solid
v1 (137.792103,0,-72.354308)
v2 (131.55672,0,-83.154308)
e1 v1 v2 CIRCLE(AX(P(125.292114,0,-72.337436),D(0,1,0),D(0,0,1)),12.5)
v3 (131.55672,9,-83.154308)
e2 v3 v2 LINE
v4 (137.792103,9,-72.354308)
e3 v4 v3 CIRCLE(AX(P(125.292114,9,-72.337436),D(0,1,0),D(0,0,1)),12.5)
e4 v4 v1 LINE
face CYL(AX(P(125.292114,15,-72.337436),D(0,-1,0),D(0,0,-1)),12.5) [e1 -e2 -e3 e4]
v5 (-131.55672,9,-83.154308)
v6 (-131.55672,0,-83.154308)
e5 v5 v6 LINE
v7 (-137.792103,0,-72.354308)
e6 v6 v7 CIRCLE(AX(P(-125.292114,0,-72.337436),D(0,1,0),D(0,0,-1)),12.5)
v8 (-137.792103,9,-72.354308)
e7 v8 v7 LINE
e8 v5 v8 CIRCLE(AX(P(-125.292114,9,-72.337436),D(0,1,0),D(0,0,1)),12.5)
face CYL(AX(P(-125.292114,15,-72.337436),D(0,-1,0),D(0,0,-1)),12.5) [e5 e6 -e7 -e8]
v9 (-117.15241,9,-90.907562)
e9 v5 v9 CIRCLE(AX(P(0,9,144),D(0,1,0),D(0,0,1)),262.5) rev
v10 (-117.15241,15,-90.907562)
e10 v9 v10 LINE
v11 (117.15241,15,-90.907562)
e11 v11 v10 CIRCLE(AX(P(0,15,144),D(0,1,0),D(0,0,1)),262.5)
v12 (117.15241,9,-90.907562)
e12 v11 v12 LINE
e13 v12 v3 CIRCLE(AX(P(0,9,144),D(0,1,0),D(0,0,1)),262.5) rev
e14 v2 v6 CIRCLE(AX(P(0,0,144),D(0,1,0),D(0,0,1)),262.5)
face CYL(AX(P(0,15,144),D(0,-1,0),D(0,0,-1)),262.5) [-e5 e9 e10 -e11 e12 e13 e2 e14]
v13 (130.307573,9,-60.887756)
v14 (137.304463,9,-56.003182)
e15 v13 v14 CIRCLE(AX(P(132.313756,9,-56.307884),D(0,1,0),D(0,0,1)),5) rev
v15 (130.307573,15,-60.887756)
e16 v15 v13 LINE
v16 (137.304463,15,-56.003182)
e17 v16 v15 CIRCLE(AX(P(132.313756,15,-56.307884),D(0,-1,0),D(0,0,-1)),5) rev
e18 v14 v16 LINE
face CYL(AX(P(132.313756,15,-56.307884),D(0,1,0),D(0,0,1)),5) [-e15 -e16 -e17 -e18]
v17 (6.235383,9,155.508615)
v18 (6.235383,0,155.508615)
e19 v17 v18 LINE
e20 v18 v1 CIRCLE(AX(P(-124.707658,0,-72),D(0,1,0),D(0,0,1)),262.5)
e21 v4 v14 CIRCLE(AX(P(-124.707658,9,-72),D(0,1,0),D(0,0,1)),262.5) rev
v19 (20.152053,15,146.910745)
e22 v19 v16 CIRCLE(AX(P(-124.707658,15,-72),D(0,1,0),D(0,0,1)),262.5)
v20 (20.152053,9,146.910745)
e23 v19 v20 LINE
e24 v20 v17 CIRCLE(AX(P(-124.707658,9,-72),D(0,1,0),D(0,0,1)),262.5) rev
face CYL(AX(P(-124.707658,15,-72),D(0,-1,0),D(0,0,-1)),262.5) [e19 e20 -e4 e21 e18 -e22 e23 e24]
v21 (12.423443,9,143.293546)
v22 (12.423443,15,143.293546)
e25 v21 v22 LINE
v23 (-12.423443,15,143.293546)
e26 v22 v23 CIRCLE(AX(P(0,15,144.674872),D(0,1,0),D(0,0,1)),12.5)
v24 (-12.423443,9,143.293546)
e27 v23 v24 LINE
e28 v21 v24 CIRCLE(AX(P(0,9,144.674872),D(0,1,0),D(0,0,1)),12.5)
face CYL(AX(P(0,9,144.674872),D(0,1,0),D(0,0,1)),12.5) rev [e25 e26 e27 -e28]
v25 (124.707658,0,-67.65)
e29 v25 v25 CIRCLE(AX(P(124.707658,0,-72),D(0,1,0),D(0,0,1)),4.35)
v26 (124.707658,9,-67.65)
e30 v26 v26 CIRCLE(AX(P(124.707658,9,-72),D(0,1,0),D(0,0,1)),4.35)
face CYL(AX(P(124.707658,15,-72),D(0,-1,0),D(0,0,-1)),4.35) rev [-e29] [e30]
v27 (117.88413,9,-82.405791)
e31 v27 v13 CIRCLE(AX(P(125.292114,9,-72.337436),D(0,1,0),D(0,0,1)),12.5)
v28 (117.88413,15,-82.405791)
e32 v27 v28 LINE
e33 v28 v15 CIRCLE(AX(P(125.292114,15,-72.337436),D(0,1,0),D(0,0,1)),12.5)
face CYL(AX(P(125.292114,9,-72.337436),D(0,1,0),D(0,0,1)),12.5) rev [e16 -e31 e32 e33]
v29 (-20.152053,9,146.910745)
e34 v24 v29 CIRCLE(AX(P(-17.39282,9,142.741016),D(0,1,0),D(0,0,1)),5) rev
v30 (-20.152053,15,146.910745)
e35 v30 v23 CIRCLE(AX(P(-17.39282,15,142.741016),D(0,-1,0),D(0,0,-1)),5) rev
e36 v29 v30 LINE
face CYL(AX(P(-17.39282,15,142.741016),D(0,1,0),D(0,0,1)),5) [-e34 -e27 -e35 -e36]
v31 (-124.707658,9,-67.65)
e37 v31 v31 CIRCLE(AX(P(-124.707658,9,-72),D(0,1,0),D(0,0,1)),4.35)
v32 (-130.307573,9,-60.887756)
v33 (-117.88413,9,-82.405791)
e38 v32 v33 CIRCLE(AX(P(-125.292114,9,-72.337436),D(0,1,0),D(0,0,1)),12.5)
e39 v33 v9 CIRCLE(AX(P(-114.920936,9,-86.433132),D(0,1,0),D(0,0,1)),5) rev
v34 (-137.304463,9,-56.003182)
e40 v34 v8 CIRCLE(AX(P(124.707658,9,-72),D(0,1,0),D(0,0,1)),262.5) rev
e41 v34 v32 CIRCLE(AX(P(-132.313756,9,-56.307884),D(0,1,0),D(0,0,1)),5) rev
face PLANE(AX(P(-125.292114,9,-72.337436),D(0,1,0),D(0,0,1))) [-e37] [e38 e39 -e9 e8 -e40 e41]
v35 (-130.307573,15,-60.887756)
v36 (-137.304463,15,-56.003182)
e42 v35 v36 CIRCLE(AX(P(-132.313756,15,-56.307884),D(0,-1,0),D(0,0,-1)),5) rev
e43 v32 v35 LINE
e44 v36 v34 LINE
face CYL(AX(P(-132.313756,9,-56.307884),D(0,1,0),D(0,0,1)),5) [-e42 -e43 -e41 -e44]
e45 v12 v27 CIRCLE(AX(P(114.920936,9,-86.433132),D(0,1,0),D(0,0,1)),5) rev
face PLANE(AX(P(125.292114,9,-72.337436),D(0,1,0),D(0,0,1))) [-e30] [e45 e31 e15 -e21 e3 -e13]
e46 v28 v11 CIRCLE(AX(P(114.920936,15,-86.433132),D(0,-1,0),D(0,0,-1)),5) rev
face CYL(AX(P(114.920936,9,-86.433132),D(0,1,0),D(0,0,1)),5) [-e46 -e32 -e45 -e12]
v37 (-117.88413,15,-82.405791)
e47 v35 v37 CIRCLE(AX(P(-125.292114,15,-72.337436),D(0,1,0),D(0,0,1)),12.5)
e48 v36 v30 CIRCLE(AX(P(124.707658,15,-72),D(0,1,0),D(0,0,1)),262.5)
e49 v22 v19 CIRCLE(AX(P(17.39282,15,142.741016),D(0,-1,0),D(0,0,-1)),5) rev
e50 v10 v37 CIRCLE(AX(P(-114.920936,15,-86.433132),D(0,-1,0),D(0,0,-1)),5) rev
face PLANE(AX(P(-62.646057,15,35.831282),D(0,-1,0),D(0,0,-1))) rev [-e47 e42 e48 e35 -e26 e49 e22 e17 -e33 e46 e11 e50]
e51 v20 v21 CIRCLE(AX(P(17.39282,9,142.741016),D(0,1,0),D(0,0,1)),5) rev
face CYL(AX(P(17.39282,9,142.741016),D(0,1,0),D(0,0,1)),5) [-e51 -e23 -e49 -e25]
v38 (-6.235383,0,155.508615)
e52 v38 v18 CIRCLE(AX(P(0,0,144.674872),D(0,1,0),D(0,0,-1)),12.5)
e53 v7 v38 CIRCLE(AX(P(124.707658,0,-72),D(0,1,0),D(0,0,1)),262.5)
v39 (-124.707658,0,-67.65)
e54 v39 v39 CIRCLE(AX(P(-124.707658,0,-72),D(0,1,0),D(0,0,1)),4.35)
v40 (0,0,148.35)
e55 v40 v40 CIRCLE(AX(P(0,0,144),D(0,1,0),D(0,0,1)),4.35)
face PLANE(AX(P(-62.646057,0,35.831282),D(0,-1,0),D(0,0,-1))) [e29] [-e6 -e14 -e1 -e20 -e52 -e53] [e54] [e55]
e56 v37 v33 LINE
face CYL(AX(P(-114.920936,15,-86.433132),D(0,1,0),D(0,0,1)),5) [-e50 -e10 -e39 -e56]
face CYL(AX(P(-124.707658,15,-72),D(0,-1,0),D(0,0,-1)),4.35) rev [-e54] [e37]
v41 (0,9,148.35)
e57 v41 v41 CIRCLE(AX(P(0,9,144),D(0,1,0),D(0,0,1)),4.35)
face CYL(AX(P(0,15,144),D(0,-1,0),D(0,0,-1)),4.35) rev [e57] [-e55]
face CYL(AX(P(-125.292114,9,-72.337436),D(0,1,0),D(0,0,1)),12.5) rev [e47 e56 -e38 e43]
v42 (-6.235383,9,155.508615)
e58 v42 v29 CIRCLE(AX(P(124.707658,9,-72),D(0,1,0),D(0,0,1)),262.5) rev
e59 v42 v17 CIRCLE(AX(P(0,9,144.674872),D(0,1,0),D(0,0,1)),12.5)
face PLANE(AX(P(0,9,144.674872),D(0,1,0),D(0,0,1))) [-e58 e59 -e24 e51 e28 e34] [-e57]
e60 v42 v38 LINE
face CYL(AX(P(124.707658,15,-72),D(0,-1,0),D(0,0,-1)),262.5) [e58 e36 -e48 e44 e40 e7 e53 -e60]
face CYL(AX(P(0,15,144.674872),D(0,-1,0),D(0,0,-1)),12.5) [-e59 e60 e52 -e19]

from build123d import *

# Parameters (mm, degrees)
CROQUIS2_R                 = 4.35
ESPESOR_DE_BASE_FIJA_DEPTH = 15
CUT_EXTRUDE1_START         = -6
SKETCH2_R                  = 12.5
CUT_EXTRUDE1_DEPTH         = 6
FILLET1_START              = 9
FILLET1_DEPTH              = 7


with BuildPart() as part:
    # Croquis2 → Espesor de base fija (new body)
    with BuildSketch(Plane(origin=(0, 0, 0), x_dir=(1, 0, 0), z_dir=(0, 1, 0))):
        with BuildLine():
            ThreePointArc((131.556719836, 83.154307611), (0, 118.5), (-131.556719836, 83.154307611))
            ThreePointArc((-131.556719836, 83.154307611), (-136.117431676, 78.58743582), (-137.792102743, 72.354307611))
            ThreePointArc((-137.792102743, 72.354307611), (-102.624010348, -59.25), (-6.235382907, -155.508615221))
            ThreePointArc((-6.235382907, -155.508615221), (0, -157.17487164), (6.235382907, -155.508615221))
            ThreePointArc((6.235382907, -155.508615221), (102.624010348, -59.25), (137.792102743, 72.354307611))
            ThreePointArc((137.792102743, 72.354307611), (136.117431676, 78.58743582), (131.556719836, 83.154307611))
        make_face()
        with Locations(Location((0, -144, 0), (0, 0, 270))):
            Circle(CROQUIS2_R, mode=Mode.SUBTRACT)
        with Locations(Location((-124.707658145, 72, 0), (0, 0, 270))):
            Circle(CROQUIS2_R, mode=Mode.SUBTRACT)
        with Locations(Location((124.707658145, 72, 0), (0, 0, 270))):
            Circle(CROQUIS2_R, mode=Mode.SUBTRACT)
    extrude(amount=ESPESOR_DE_BASE_FIJA_DEPTH)

    # Sketch2 → Cut-Extrude1 (cut)
    with BuildSketch(Plane(origin=(0, 15, 0), x_dir=(1, 0, 0), z_dir=(0, 1, 0)).offset(CUT_EXTRUDE1_START)):
        with Locations((-125.292114129, 72.33743582)):
            Circle(SKETCH2_R)
        with Locations((125.292114129, 72.33743582)):
            Circle(SKETCH2_R)
        with Locations((0, -144.67487164)):
            Circle(SKETCH2_R)
    extrude(amount=CUT_EXTRUDE1_DEPTH, mode=Mode.SUBTRACT)

    # Fillet1: read off the stored shape, not the designer's step
    # Fillet1 outline → Fillet1 (cut)
    with BuildSketch(Plane(origin=(0, 0, 0), x_dir=(1, 0, 0), z_dir=(0, 1, 0)).offset(FILLET1_START)):
        with BuildLine():
            ThreePointArc((-117.884129659, 82.405790506), (-119.902519436, 86.861880767), (-117.152410353, 90.907562135))
            ThreePointArc((-117.152410353, 90.907562135), (-124.41497538, 87.143167542), (-131.556719836, 83.154307611))
            ThreePointArc((-131.556719836, 83.154307611), (-124.608814624, 84.818745919), (-117.884129659, 82.405790506))
        make_face()
        with BuildLine():
            ThreePointArc((131.556719836, 83.154307611), (124.41497538, 87.143167542), (117.152410353, 90.907562136))
            ThreePointArc((117.152410353, 90.907562136), (119.902519436, 86.861880767), (117.884129659, 82.405790506))
            ThreePointArc((117.884129659, 82.405790506), (124.608814624, 84.818745919), (131.556719836, 83.154307611))
        make_face()
        with BuildLine():
            ThreePointArc((-137.304463382, 56.003182413), (-135.175855082, 60.407687426), (-130.307572826, 60.887755734))
            ThreePointArc((-130.307572826, 60.887755734), (-135.759595995, 65.505026041), (-137.792102743, 72.354307611))
            ThreePointArc((-137.792102743, 72.354307611), (-137.675684548, 64.174945519), (-137.304463382, 56.003182413))
        make_face()
        with BuildLine():
            ThreePointArc((137.792102743, 72.354307611), (135.759595995, 65.505026041), (130.307572826, 60.887755734))
            ThreePointArc((130.307572826, 60.887755734), (135.175855082, 60.407687426), (137.304463382, 56.003182413))
            ThreePointArc((137.304463382, 56.003182413), (137.675684548, 64.174945519), (137.792102743, 72.354307611))
        make_face()
        with BuildLine():
            ThreePointArc((-12.423443168, -143.29354624), (-15.273335646, -147.269568193), (-20.152053029, -146.910744548))
            ThreePointArc((-20.152053029, -146.910744548), (-13.260709167, -151.31811306), (-6.235382907, -155.508615221))
            ThreePointArc((-6.235382907, -155.508615221), (-11.15078137, -150.323771959), (-12.423443168, -143.29354624))
        make_face()
        with BuildLine():
            ThreePointArc((6.235382907, -155.508615221), (13.260709167, -151.31811306), (20.152053029, -146.910744548))
            ThreePointArc((20.152053029, -146.910744548), (15.273335646, -147.269568193), (12.423443168, -143.29354624))
            ThreePointArc((12.423443168, -143.29354624), (11.15078137, -150.323771959), (6.235382907, -155.508615221))
        make_face()
    extrude(amount=FILLET1_DEPTH, mode=Mode.SUBTRACT)


solid = part.part
